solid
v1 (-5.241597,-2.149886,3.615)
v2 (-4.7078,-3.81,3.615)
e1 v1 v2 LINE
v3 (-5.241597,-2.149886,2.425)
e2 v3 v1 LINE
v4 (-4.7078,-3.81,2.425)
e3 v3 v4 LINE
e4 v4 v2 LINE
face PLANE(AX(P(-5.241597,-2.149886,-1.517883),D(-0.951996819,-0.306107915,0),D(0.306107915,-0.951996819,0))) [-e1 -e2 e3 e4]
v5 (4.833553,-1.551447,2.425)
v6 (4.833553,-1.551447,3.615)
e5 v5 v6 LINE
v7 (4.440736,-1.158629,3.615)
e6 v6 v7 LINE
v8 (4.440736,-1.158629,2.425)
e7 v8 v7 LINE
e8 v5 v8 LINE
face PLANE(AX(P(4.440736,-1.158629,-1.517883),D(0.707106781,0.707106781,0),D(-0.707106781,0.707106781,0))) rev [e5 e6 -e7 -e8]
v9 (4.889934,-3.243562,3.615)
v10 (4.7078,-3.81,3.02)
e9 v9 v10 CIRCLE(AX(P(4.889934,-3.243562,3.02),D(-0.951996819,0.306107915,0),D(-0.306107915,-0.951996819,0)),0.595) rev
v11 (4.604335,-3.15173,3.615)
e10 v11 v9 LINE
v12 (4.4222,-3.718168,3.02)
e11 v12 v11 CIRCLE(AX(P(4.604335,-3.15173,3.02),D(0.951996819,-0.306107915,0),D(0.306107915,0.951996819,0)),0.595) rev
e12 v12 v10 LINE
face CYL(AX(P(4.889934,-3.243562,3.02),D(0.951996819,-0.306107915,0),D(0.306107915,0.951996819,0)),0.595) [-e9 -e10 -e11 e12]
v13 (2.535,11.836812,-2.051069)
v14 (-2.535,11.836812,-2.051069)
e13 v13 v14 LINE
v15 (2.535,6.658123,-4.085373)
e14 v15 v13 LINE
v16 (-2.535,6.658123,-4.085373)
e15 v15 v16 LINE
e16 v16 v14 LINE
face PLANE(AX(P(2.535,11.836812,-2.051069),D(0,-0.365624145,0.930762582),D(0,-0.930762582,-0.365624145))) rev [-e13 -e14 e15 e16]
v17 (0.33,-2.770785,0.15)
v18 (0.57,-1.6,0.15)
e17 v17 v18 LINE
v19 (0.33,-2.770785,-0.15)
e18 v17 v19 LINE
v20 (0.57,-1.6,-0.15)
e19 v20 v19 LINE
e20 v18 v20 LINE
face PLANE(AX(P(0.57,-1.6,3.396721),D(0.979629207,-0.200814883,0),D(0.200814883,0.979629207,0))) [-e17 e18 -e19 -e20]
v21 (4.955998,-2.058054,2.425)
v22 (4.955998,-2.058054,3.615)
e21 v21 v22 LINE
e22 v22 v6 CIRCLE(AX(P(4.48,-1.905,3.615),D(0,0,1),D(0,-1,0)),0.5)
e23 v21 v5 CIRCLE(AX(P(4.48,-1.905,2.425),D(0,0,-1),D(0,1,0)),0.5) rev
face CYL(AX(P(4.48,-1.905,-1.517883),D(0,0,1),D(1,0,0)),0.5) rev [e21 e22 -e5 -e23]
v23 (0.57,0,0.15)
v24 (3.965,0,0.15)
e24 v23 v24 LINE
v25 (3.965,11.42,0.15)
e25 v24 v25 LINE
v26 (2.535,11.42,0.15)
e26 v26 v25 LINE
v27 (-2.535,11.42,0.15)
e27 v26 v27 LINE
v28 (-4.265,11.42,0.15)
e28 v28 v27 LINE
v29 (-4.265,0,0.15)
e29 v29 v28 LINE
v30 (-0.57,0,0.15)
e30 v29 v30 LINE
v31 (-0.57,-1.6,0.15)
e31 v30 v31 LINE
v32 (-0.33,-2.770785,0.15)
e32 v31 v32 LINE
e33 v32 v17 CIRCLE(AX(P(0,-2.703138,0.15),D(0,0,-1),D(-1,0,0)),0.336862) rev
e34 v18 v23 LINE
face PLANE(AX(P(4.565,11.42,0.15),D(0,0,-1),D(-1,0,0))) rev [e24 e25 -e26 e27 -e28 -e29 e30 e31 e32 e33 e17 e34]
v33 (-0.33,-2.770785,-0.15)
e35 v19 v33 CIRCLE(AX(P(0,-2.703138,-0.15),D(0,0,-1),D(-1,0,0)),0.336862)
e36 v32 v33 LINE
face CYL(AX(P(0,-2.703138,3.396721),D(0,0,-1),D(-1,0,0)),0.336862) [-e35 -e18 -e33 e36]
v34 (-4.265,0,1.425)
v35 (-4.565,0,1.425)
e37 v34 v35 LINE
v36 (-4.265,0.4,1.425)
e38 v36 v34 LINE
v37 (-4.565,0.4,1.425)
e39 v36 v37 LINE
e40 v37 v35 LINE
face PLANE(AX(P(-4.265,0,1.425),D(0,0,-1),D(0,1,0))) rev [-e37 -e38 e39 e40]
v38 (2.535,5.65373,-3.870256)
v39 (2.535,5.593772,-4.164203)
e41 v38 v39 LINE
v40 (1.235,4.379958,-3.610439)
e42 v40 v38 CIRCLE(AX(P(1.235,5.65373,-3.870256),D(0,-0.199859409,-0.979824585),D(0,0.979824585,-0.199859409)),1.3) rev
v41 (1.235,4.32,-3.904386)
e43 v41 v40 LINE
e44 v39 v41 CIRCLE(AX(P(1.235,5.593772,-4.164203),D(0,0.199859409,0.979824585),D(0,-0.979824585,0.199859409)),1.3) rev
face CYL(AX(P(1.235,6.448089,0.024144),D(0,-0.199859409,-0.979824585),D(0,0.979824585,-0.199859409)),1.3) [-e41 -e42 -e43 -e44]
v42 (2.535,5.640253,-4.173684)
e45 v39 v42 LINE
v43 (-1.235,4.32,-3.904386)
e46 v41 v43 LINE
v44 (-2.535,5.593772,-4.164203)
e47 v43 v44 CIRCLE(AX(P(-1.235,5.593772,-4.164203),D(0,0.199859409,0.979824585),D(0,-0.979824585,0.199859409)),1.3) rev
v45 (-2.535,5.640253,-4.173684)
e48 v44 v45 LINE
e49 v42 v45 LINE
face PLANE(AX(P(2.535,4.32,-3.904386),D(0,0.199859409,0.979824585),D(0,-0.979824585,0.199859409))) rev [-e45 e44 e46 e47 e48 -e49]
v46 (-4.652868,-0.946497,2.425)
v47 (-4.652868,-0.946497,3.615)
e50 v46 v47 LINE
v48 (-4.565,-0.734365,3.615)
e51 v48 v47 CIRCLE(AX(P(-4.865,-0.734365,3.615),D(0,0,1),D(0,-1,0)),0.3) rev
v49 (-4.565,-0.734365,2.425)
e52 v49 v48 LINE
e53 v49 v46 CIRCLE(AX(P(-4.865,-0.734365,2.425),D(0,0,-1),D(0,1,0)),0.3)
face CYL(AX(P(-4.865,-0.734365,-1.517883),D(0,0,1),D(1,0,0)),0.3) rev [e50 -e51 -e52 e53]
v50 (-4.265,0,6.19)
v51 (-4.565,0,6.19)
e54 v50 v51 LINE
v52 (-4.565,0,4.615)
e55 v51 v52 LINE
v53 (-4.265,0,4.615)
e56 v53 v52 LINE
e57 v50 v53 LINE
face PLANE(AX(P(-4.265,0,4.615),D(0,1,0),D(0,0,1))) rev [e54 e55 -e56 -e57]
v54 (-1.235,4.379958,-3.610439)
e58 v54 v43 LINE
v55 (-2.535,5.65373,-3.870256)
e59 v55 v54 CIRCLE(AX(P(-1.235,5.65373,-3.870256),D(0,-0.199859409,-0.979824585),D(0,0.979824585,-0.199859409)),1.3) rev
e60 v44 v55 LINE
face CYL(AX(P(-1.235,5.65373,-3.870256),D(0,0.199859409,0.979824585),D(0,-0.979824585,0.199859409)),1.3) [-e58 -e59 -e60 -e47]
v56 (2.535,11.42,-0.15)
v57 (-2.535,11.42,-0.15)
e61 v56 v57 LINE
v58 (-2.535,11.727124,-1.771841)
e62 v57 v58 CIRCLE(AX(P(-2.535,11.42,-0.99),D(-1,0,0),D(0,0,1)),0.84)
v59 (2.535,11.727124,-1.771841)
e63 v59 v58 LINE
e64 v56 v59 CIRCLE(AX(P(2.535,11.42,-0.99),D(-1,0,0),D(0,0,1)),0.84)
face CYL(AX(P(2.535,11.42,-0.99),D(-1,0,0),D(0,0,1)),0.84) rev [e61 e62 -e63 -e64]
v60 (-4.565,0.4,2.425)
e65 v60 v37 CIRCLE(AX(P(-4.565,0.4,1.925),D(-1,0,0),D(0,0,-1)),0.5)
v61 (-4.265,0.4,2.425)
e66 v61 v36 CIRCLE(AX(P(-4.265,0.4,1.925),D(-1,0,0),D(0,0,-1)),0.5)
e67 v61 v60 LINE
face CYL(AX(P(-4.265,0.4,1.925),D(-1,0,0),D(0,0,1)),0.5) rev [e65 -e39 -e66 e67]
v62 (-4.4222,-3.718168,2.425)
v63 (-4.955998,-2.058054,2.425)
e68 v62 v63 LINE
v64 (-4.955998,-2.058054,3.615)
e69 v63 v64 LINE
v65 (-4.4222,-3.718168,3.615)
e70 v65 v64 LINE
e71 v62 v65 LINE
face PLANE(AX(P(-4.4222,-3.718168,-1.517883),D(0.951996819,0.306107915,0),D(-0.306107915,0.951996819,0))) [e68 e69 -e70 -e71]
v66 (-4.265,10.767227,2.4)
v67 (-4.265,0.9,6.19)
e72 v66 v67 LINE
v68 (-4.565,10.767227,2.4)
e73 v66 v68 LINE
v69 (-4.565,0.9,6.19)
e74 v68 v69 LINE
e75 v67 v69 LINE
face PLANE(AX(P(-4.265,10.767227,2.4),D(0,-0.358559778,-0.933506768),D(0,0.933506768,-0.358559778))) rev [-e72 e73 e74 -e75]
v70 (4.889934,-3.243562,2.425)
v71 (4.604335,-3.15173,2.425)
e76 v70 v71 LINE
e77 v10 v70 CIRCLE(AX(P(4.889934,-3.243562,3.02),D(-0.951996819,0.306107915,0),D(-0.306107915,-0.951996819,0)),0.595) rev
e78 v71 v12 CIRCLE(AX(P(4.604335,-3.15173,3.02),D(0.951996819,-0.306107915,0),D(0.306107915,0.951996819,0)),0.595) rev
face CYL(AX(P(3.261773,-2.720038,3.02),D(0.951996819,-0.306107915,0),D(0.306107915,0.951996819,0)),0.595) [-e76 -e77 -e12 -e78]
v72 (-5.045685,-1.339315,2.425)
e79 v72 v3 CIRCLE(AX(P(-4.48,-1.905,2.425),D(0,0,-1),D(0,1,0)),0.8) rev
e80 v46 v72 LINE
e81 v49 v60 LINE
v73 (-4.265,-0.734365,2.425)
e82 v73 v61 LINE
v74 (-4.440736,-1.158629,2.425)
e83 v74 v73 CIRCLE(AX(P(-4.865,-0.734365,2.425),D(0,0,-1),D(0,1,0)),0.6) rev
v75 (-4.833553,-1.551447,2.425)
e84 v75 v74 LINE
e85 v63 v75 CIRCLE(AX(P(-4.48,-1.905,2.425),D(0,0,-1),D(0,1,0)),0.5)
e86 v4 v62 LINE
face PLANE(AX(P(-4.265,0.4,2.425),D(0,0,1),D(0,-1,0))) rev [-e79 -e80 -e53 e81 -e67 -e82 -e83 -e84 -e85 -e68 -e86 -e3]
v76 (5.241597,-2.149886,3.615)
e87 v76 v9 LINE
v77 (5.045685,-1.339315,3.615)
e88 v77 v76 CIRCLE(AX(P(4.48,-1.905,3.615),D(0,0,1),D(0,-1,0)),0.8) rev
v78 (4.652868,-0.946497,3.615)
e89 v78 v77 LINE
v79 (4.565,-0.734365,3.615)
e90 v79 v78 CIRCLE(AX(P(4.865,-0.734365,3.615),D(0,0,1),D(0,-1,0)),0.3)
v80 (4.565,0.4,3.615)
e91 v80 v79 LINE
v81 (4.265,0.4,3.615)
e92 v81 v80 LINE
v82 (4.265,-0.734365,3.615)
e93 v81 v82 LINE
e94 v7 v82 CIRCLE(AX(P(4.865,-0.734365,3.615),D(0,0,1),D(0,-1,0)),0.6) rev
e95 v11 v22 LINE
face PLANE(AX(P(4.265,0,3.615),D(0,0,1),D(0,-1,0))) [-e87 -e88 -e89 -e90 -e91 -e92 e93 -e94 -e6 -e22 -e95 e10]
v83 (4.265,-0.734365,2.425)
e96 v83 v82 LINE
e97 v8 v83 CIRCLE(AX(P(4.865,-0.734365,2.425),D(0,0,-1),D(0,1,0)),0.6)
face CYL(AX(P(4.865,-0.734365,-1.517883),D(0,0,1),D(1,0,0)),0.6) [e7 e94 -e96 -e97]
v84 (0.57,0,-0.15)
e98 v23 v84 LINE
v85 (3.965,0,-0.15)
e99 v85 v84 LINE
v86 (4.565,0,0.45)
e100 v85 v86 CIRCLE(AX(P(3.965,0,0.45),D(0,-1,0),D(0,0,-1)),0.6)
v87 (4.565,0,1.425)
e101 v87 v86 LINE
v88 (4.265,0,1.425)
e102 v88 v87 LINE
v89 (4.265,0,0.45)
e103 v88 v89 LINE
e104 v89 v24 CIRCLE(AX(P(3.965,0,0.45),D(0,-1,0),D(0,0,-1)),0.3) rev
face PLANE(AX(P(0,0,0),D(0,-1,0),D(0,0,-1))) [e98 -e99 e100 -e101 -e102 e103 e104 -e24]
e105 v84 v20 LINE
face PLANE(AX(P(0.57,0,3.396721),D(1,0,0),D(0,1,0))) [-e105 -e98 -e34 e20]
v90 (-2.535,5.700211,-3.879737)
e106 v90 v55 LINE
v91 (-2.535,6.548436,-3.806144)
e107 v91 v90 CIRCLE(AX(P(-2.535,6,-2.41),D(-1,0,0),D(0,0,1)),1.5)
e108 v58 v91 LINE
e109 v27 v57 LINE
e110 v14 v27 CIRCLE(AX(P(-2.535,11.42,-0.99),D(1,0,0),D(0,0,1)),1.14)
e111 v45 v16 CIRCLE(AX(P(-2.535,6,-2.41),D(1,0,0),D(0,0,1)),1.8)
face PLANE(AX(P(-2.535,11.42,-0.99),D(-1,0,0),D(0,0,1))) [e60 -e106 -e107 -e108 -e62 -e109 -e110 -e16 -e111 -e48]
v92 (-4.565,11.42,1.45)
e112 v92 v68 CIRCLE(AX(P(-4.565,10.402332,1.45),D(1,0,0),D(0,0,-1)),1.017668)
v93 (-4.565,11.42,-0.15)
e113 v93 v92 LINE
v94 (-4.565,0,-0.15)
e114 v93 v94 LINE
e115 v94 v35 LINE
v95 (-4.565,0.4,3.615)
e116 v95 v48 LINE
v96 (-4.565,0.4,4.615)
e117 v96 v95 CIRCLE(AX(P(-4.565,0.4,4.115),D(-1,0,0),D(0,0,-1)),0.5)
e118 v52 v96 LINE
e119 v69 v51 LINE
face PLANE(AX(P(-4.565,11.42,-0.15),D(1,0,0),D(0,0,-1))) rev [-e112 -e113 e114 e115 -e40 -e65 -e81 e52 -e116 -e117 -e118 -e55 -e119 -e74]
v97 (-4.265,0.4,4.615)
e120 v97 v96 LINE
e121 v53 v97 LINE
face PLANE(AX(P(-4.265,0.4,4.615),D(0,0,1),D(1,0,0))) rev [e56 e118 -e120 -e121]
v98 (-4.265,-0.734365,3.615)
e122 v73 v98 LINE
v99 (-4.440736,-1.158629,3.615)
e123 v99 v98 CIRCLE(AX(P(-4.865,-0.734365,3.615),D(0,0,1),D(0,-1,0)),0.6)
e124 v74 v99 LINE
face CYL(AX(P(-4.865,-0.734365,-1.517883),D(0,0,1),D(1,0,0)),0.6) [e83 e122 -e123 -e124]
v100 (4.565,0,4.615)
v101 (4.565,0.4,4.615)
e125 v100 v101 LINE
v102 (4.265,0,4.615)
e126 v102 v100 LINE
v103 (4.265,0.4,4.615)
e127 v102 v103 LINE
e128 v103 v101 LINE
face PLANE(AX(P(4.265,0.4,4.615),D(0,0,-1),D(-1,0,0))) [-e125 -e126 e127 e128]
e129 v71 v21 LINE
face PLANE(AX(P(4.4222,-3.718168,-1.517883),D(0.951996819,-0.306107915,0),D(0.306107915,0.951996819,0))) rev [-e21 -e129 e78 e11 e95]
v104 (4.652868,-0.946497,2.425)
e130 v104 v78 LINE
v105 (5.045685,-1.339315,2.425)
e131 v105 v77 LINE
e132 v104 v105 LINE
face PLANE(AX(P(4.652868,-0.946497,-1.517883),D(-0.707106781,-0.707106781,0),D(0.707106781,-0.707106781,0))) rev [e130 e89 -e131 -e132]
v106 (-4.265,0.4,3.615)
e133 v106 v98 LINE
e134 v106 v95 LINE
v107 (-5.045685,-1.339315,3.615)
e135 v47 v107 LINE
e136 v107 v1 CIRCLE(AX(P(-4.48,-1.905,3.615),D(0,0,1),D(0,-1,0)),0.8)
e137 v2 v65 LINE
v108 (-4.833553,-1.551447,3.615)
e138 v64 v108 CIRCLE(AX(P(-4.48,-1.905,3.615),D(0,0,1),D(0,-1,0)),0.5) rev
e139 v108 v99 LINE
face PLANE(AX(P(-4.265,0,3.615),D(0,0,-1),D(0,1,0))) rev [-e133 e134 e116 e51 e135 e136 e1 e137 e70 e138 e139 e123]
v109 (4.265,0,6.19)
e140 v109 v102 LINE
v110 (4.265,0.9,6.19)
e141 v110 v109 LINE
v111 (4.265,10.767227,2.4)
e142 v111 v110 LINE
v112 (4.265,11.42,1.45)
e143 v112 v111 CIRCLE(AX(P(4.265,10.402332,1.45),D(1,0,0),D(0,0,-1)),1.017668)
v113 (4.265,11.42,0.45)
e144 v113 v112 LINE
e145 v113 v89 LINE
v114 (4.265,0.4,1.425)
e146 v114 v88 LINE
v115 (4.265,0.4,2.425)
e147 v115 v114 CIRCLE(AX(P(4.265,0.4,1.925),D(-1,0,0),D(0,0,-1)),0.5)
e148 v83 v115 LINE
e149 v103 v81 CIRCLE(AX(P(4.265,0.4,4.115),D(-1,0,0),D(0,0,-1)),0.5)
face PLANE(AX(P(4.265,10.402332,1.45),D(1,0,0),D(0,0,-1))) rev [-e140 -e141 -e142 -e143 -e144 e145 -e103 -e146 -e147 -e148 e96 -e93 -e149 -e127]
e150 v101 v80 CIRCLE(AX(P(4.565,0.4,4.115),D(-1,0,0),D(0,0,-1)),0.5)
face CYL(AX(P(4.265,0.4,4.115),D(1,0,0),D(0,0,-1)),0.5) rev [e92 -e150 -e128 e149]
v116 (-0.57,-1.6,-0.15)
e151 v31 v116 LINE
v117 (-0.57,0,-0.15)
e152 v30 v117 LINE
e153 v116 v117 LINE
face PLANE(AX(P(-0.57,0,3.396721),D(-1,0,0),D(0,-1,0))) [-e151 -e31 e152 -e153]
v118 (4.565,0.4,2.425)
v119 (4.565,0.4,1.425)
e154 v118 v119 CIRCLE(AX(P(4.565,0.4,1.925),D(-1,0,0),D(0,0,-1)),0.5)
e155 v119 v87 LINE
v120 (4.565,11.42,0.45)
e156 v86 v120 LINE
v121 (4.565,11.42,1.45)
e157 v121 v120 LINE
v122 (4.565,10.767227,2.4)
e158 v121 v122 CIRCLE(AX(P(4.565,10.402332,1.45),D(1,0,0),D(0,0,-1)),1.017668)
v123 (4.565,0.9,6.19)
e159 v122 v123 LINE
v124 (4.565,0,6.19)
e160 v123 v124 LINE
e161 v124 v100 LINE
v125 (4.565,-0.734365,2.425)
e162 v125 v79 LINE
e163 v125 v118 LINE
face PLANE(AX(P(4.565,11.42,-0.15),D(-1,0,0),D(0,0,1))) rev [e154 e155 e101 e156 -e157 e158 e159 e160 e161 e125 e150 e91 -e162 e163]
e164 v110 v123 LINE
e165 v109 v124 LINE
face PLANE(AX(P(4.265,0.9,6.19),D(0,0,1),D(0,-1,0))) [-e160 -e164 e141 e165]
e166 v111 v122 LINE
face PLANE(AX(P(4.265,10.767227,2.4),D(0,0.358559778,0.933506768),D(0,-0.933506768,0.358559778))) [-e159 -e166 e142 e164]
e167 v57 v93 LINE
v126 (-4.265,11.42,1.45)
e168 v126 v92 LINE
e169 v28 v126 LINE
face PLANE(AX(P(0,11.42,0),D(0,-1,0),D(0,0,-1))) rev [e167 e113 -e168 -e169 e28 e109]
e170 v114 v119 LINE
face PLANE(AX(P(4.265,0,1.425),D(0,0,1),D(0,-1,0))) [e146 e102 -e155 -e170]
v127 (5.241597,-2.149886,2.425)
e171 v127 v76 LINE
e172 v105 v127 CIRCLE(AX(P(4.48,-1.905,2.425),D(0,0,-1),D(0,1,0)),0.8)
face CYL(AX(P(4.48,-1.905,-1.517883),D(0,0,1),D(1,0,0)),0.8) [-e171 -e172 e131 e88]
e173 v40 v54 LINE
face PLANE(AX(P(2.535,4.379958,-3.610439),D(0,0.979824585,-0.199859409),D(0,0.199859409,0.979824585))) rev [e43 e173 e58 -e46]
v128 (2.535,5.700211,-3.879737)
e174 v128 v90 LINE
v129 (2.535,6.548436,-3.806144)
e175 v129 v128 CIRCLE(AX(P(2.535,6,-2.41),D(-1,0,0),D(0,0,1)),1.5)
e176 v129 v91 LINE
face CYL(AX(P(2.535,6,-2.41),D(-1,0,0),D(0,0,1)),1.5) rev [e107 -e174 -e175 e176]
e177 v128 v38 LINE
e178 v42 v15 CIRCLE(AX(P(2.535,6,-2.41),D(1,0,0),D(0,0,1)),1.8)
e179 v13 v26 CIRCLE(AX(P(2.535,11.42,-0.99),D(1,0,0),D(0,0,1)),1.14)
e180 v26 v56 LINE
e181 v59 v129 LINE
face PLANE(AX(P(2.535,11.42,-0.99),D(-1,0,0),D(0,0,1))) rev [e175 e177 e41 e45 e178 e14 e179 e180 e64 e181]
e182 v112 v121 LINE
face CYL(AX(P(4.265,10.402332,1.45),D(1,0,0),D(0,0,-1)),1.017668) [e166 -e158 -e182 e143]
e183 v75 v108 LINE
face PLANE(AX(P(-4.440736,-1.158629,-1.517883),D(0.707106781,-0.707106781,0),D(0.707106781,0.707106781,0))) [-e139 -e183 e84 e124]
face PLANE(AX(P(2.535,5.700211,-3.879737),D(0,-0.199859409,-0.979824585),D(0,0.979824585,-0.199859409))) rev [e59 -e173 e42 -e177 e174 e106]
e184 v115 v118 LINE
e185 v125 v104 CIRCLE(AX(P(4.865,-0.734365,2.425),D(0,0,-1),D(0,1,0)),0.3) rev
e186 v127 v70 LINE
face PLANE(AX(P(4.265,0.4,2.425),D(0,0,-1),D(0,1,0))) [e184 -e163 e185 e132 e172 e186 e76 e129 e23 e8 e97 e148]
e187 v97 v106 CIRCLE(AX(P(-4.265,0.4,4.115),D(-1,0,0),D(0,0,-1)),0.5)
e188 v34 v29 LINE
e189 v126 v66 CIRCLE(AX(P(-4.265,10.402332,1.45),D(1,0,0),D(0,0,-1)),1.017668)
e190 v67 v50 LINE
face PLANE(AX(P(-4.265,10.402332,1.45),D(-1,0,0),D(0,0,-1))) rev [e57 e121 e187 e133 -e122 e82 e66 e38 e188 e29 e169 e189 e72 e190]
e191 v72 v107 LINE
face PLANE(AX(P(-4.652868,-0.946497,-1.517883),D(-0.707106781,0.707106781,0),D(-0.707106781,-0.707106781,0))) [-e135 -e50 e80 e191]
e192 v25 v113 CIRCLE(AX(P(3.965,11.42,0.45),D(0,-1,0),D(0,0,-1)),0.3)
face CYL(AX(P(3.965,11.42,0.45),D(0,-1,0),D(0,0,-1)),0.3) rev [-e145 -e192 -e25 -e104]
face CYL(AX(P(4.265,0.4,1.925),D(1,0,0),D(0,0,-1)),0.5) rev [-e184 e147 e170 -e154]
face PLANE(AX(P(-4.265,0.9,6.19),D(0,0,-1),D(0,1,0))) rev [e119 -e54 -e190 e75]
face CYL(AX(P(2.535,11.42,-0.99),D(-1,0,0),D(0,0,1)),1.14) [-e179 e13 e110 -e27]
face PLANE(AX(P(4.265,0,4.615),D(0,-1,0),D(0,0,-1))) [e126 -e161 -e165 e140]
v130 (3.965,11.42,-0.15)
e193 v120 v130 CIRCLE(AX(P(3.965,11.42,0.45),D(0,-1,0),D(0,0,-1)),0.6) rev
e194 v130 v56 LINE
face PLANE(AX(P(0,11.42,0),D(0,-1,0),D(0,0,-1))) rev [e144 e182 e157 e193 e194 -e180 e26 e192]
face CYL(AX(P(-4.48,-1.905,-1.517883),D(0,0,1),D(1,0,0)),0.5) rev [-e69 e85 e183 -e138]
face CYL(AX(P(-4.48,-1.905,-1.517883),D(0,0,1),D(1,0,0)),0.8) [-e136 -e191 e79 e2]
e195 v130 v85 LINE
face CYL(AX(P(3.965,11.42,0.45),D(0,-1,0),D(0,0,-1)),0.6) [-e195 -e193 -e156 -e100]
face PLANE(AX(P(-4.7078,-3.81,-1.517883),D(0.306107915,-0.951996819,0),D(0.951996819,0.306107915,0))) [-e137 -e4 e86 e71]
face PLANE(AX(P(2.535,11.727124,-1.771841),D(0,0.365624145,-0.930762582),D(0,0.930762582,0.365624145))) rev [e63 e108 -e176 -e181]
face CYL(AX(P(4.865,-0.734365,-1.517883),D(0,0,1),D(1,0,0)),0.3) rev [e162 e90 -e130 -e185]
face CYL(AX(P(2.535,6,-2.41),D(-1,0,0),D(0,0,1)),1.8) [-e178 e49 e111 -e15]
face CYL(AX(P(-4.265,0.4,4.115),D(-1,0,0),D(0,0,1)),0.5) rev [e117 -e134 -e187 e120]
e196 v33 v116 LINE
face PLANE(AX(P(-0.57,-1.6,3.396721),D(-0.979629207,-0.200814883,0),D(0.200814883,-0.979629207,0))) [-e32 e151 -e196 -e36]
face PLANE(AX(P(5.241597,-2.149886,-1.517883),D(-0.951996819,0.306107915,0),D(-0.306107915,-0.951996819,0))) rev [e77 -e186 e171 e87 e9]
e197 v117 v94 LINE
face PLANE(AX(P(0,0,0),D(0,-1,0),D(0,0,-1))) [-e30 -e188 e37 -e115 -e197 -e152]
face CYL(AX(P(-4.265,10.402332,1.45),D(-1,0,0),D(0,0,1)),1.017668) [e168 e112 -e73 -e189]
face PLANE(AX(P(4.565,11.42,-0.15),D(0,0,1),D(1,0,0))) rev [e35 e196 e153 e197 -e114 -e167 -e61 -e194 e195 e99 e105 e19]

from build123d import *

# Parameters (mm, degrees)
SKETCH1_W                       = 9.13
SKETCH1_H                       = 0.3
BOSS_EXTRUDE1_DEPTH             = 11.42
BOSS_EXTRUDE2_DEPTH             = 2.535
FILLET1_R                       = 1.3
BOSS_EXTRUDE3_DEPTH             = 0.3
BOSS_EXTRUDE4_DEPTH             = 0.3
FILLET2_R                       = 0.3
FILLET3_R                       = 0.6
BOSS_EXTRUDE5_REACH             = 17.194
BOSS_EXTRUDE5_DIRECTION_2_REACH = 17.194
FILLET4_R                       = 0.595


with BuildPart() as part:
    # Sketch1 → Boss-Extrude1 (new body)
    with BuildSketch(Plane(origin=(0, 0, 0), x_dir=(1, 0, 0), z_dir=(0, 1, 0))):
        Rectangle(SKETCH1_W, SKETCH1_H)
    extrude(amount=BOSS_EXTRUDE1_DEPTH)

    # Sketch2 → Boss-Extrude2 (add, symmetric)
    with BuildSketch(Plane(origin=(0, 0, 0), x_dir=(0, 0, -1), z_dir=(1, 0, 0))):
        with BuildLine():
            Line((-0.15, 11.42), (0.15, 11.42))
            ThreePointArc((0.15, 11.42), (0.83370873, 12.245332078), (1.771840569, 11.727124282))
            Line((1.771840569, 11.727124282), (3.806143873, 6.548436218))
            ThreePointArc((3.806143873, 6.548436218), (3.904386052, 6.129654649), (3.879736877, 5.700210886))
            Line((3.879736877, 5.700210886), (3.610438676, 4.379957823))
            Line((3.610438676, 4.379957823), (3.904386052, 4.32))
            Line((3.904386052, 4.32), (4.173684252, 5.640253063))
            ThreePointArc((4.173684252, 5.640253063), (4.203263262, 6.155585579), (4.085372648, 6.658123461))
            Line((4.085372648, 6.658123461), (2.051069344, 11.836811525))
            ThreePointArc((2.051069344, 11.836811525), (0.77789042, 12.540093534), (-0.15, 11.42))
        make_face()
    extrude(amount=BOSS_EXTRUDE2_DEPTH, both=True)

    # Fillet1
    fillet1_edges = [part.edges().sort_by_distance(p)[0] for p in [
        (-2.535, 4.349978911, -3.757412364),
        (2.535, 4.349978911, -3.757412364),
    ]]
    fillet(fillet1_edges, radius=FILLET1_R)

    # Sketch3 → Boss-Extrude3 (add)
    with BuildSketch(Plane(origin=(0, 0, -0.15), x_dir=(-1, 0, 0), z_dir=(0, 0, -1))):
        with BuildLine():
            Line((-0.57, 0), (0.57, 0))
            Line((0.57, 0), (0.57, -1.6))
            Line((0.57, -1.6), (0.33, -2.770784784))
            ThreePointArc((0.33, -2.770784784), (0, -3.04), (-0.33, -2.770784784))
            Line((-0.33, -2.770784784), (-0.57, -1.6))
            Line((-0.57, -1.6), (-0.57, 0))
        make_face()
    extrude(amount=-BOSS_EXTRUDE3_DEPTH)

    # Sketch4 → Boss-Extrude4 (add)
    with BuildSketch(Plane(origin=(4.565, 0, 0), x_dir=(0, 0, -1), z_dir=(1, 0, 0))):
        with BuildLine():
            Line((-0.15, 11.42), (-0.15, 0))
            Line((-0.15, 0), (-1.425, 0))
            Line((-1.425, 0), (-1.425, 0.4))
            ThreePointArc((-1.425, 0.4), (-1.925, 0.9), (-2.425, 0.4))
            Line((-2.425, 0.4), (-2.425, 0))
            Line((-2.425, 0), (-3.615, 0))
            Line((-3.615, 0), (-3.615, 0.4))
            ThreePointArc((-3.615, 0.4), (-4.115, 0.9), (-4.615, 0.4))
            Line((-4.615, 0.4), (-4.615, 0))
            Line((-4.615, 0), (-6.19, 0))
            Line((-6.19, 0), (-6.19, 0.9))
            Line((-6.19, 0.9), (-2.4, 10.767226789))
            ThreePointArc((-2.4, 10.767226789), (-2.026327352, 11.241078061), (-1.45, 11.42))
            Line((-1.45, 11.42), (-0.15, 11.42))
        make_face()
    boss_extrude4 = extrude(amount=-BOSS_EXTRUDE4_DEPTH)

    # Fillet2
    fillet2_edges = [part.edges().sort_by_distance(p)[0] for p in [
        (4.265, 5.71, 0.15),
    ]]
    fillet(fillet2_edges, radius=FILLET2_R)

    # Fillet3
    fillet3_edges = [part.edges().sort_by_distance(p)[0] for p in [
        (4.565, 5.71, -0.15),
    ]]
    fillet(fillet3_edges, radius=FILLET3_R)

    # Boss-Extrude5: up to this face of the body (flat: up to its plane)
    boss_extrude5_end = Plane(part.part.faces().sort_by_distance((4.415, 0.2, 2.425))[0])
    # Sketch5 → Boss-Extrude5 (add, up to the picked face)
    with BuildSketch(Plane(origin=(0, 0, 3.02), x_dir=(-1, 0, 0), z_dir=(0, 0, -1)), mode=Mode.PRIVATE) as boss_extrude5_sk1:
        with BuildLine():
            Line((-4.565, 0), (-4.265, 0))
            Line((-4.265, 0), (-4.265, -0.734365081))
            ThreePointArc((-4.265, -0.734365081), (-4.31067228, -0.963975141), (-4.440735931, -1.15862915))
            Line((-4.440735931, -1.15862915), (-4.833553391, -1.551446609))
            ThreePointArc((-4.833553391, -1.551446609), (-4.966005966, -1.787534255), (-4.95599841, -2.058053958))
            Line((-4.95599841, -2.058053958), (-4.422200477, -3.718167625))
            Line((-4.422200477, -3.718167625), (-4.707799523, -3.81))
            Line((-4.707799523, -3.81), (-5.241597456, -2.149886332))
            ThreePointArc((-5.241597456, -2.149886332), (-5.257609545, -1.717054807), (-5.045685425, -1.339314575))
            Line((-5.045685425, -1.339314575), (-4.652867966, -0.946497116))
            ThreePointArc((-4.652867966, -0.946497116), (-4.58783614, -0.849170111), (-4.565, -0.734365081))
            Line((-4.565, -0.734365081), (-4.565, 0))
        make_face()
    boss_extrude5_tool1 = split(extrude(boss_extrude5_sk1.sketch, amount=BOSS_EXTRUDE5_REACH, mode=Mode.PRIVATE), bisect_by=boss_extrude5_end, keep=Keep.BOTH, mode=Mode.PRIVATE)
    boss_extrude5 = boss_extrude5_tool1.solids().sort_by(Axis((4.415, -0.039429, 3.02), (0, 0, -1)))[0]
    add(boss_extrude5)

    # Boss-Extrude5 direction 2: up to this face of the body (flat: up to its plane)
    boss_extrude5_direction_2_end = Plane(part.part.faces().sort_by_distance((4.415, 0.2, 3.615))[0])
    # Sketch5 → Boss-Extrude5 direction 2 (add, up to the picked face)
    with BuildSketch(Plane(origin=(0, 0, 3.02), x_dir=(-1, 0, 0), z_dir=(0, 0, -1)), mode=Mode.PRIVATE) as boss_extrude5_direction_2_sk1:
        with BuildLine():
            Line((-4.565, 0), (-4.265, 0))
            Line((-4.265, 0), (-4.265, -0.734365081))
            ThreePointArc((-4.265, -0.734365081), (-4.31067228, -0.963975141), (-4.440735931, -1.15862915))
            Line((-4.440735931, -1.15862915), (-4.833553391, -1.551446609))
            ThreePointArc((-4.833553391, -1.551446609), (-4.966005966, -1.787534255), (-4.95599841, -2.058053958))
            Line((-4.95599841, -2.058053958), (-4.422200477, -3.718167625))
            Line((-4.422200477, -3.718167625), (-4.707799523, -3.81))
            Line((-4.707799523, -3.81), (-5.241597456, -2.149886332))
            ThreePointArc((-5.241597456, -2.149886332), (-5.257609545, -1.717054807), (-5.045685425, -1.339314575))
            Line((-5.045685425, -1.339314575), (-4.652867966, -0.946497116))
            ThreePointArc((-4.652867966, -0.946497116), (-4.58783614, -0.849170111), (-4.565, -0.734365081))
            Line((-4.565, -0.734365081), (-4.565, 0))
        make_face()
    boss_extrude5_direction_2_tool1 = split(extrude(boss_extrude5_direction_2_sk1.sketch, amount=-BOSS_EXTRUDE5_DIRECTION_2_REACH, mode=Mode.PRIVATE), bisect_by=boss_extrude5_direction_2_end, keep=Keep.BOTH, mode=Mode.PRIVATE)
    boss_extrude5_direction_2 = boss_extrude5_direction_2_tool1.solids().sort_by(Axis((4.415, -0.039429, 3.02), (0, 0, 1)))[0]
    add(boss_extrude5_direction_2)

    # Fillet4
    fillet4_edges = [part.edges().sort_by_distance(p)[0] for p in [
        (4.565, -3.764083813, 2.425),
        (4.565, -3.764083813, 3.615),
    ]]
    fillet(fillet4_edges, radius=FILLET4_R - 0.0001)  # a hair under: the kernel refuses the full size

    # Mirror1: Boss-Extrude4, Boss-Extrude5, Boss-Extrude5 direction 2 across plane
    add(boss_extrude4.mirror(Plane(origin=(0, 0, 0), x_dir=(0, 0, 1), z_dir=(1, 0, 0))))
    add(boss_extrude5.mirror(Plane(origin=(0, 0, 0), x_dir=(0, 0, 1), z_dir=(1, 0, 0))))
    add(boss_extrude5_direction_2.mirror(Plane(origin=(0, 0, 0), x_dir=(0, 0, 1), z_dir=(1, 0, 0))))


solid = part.part
